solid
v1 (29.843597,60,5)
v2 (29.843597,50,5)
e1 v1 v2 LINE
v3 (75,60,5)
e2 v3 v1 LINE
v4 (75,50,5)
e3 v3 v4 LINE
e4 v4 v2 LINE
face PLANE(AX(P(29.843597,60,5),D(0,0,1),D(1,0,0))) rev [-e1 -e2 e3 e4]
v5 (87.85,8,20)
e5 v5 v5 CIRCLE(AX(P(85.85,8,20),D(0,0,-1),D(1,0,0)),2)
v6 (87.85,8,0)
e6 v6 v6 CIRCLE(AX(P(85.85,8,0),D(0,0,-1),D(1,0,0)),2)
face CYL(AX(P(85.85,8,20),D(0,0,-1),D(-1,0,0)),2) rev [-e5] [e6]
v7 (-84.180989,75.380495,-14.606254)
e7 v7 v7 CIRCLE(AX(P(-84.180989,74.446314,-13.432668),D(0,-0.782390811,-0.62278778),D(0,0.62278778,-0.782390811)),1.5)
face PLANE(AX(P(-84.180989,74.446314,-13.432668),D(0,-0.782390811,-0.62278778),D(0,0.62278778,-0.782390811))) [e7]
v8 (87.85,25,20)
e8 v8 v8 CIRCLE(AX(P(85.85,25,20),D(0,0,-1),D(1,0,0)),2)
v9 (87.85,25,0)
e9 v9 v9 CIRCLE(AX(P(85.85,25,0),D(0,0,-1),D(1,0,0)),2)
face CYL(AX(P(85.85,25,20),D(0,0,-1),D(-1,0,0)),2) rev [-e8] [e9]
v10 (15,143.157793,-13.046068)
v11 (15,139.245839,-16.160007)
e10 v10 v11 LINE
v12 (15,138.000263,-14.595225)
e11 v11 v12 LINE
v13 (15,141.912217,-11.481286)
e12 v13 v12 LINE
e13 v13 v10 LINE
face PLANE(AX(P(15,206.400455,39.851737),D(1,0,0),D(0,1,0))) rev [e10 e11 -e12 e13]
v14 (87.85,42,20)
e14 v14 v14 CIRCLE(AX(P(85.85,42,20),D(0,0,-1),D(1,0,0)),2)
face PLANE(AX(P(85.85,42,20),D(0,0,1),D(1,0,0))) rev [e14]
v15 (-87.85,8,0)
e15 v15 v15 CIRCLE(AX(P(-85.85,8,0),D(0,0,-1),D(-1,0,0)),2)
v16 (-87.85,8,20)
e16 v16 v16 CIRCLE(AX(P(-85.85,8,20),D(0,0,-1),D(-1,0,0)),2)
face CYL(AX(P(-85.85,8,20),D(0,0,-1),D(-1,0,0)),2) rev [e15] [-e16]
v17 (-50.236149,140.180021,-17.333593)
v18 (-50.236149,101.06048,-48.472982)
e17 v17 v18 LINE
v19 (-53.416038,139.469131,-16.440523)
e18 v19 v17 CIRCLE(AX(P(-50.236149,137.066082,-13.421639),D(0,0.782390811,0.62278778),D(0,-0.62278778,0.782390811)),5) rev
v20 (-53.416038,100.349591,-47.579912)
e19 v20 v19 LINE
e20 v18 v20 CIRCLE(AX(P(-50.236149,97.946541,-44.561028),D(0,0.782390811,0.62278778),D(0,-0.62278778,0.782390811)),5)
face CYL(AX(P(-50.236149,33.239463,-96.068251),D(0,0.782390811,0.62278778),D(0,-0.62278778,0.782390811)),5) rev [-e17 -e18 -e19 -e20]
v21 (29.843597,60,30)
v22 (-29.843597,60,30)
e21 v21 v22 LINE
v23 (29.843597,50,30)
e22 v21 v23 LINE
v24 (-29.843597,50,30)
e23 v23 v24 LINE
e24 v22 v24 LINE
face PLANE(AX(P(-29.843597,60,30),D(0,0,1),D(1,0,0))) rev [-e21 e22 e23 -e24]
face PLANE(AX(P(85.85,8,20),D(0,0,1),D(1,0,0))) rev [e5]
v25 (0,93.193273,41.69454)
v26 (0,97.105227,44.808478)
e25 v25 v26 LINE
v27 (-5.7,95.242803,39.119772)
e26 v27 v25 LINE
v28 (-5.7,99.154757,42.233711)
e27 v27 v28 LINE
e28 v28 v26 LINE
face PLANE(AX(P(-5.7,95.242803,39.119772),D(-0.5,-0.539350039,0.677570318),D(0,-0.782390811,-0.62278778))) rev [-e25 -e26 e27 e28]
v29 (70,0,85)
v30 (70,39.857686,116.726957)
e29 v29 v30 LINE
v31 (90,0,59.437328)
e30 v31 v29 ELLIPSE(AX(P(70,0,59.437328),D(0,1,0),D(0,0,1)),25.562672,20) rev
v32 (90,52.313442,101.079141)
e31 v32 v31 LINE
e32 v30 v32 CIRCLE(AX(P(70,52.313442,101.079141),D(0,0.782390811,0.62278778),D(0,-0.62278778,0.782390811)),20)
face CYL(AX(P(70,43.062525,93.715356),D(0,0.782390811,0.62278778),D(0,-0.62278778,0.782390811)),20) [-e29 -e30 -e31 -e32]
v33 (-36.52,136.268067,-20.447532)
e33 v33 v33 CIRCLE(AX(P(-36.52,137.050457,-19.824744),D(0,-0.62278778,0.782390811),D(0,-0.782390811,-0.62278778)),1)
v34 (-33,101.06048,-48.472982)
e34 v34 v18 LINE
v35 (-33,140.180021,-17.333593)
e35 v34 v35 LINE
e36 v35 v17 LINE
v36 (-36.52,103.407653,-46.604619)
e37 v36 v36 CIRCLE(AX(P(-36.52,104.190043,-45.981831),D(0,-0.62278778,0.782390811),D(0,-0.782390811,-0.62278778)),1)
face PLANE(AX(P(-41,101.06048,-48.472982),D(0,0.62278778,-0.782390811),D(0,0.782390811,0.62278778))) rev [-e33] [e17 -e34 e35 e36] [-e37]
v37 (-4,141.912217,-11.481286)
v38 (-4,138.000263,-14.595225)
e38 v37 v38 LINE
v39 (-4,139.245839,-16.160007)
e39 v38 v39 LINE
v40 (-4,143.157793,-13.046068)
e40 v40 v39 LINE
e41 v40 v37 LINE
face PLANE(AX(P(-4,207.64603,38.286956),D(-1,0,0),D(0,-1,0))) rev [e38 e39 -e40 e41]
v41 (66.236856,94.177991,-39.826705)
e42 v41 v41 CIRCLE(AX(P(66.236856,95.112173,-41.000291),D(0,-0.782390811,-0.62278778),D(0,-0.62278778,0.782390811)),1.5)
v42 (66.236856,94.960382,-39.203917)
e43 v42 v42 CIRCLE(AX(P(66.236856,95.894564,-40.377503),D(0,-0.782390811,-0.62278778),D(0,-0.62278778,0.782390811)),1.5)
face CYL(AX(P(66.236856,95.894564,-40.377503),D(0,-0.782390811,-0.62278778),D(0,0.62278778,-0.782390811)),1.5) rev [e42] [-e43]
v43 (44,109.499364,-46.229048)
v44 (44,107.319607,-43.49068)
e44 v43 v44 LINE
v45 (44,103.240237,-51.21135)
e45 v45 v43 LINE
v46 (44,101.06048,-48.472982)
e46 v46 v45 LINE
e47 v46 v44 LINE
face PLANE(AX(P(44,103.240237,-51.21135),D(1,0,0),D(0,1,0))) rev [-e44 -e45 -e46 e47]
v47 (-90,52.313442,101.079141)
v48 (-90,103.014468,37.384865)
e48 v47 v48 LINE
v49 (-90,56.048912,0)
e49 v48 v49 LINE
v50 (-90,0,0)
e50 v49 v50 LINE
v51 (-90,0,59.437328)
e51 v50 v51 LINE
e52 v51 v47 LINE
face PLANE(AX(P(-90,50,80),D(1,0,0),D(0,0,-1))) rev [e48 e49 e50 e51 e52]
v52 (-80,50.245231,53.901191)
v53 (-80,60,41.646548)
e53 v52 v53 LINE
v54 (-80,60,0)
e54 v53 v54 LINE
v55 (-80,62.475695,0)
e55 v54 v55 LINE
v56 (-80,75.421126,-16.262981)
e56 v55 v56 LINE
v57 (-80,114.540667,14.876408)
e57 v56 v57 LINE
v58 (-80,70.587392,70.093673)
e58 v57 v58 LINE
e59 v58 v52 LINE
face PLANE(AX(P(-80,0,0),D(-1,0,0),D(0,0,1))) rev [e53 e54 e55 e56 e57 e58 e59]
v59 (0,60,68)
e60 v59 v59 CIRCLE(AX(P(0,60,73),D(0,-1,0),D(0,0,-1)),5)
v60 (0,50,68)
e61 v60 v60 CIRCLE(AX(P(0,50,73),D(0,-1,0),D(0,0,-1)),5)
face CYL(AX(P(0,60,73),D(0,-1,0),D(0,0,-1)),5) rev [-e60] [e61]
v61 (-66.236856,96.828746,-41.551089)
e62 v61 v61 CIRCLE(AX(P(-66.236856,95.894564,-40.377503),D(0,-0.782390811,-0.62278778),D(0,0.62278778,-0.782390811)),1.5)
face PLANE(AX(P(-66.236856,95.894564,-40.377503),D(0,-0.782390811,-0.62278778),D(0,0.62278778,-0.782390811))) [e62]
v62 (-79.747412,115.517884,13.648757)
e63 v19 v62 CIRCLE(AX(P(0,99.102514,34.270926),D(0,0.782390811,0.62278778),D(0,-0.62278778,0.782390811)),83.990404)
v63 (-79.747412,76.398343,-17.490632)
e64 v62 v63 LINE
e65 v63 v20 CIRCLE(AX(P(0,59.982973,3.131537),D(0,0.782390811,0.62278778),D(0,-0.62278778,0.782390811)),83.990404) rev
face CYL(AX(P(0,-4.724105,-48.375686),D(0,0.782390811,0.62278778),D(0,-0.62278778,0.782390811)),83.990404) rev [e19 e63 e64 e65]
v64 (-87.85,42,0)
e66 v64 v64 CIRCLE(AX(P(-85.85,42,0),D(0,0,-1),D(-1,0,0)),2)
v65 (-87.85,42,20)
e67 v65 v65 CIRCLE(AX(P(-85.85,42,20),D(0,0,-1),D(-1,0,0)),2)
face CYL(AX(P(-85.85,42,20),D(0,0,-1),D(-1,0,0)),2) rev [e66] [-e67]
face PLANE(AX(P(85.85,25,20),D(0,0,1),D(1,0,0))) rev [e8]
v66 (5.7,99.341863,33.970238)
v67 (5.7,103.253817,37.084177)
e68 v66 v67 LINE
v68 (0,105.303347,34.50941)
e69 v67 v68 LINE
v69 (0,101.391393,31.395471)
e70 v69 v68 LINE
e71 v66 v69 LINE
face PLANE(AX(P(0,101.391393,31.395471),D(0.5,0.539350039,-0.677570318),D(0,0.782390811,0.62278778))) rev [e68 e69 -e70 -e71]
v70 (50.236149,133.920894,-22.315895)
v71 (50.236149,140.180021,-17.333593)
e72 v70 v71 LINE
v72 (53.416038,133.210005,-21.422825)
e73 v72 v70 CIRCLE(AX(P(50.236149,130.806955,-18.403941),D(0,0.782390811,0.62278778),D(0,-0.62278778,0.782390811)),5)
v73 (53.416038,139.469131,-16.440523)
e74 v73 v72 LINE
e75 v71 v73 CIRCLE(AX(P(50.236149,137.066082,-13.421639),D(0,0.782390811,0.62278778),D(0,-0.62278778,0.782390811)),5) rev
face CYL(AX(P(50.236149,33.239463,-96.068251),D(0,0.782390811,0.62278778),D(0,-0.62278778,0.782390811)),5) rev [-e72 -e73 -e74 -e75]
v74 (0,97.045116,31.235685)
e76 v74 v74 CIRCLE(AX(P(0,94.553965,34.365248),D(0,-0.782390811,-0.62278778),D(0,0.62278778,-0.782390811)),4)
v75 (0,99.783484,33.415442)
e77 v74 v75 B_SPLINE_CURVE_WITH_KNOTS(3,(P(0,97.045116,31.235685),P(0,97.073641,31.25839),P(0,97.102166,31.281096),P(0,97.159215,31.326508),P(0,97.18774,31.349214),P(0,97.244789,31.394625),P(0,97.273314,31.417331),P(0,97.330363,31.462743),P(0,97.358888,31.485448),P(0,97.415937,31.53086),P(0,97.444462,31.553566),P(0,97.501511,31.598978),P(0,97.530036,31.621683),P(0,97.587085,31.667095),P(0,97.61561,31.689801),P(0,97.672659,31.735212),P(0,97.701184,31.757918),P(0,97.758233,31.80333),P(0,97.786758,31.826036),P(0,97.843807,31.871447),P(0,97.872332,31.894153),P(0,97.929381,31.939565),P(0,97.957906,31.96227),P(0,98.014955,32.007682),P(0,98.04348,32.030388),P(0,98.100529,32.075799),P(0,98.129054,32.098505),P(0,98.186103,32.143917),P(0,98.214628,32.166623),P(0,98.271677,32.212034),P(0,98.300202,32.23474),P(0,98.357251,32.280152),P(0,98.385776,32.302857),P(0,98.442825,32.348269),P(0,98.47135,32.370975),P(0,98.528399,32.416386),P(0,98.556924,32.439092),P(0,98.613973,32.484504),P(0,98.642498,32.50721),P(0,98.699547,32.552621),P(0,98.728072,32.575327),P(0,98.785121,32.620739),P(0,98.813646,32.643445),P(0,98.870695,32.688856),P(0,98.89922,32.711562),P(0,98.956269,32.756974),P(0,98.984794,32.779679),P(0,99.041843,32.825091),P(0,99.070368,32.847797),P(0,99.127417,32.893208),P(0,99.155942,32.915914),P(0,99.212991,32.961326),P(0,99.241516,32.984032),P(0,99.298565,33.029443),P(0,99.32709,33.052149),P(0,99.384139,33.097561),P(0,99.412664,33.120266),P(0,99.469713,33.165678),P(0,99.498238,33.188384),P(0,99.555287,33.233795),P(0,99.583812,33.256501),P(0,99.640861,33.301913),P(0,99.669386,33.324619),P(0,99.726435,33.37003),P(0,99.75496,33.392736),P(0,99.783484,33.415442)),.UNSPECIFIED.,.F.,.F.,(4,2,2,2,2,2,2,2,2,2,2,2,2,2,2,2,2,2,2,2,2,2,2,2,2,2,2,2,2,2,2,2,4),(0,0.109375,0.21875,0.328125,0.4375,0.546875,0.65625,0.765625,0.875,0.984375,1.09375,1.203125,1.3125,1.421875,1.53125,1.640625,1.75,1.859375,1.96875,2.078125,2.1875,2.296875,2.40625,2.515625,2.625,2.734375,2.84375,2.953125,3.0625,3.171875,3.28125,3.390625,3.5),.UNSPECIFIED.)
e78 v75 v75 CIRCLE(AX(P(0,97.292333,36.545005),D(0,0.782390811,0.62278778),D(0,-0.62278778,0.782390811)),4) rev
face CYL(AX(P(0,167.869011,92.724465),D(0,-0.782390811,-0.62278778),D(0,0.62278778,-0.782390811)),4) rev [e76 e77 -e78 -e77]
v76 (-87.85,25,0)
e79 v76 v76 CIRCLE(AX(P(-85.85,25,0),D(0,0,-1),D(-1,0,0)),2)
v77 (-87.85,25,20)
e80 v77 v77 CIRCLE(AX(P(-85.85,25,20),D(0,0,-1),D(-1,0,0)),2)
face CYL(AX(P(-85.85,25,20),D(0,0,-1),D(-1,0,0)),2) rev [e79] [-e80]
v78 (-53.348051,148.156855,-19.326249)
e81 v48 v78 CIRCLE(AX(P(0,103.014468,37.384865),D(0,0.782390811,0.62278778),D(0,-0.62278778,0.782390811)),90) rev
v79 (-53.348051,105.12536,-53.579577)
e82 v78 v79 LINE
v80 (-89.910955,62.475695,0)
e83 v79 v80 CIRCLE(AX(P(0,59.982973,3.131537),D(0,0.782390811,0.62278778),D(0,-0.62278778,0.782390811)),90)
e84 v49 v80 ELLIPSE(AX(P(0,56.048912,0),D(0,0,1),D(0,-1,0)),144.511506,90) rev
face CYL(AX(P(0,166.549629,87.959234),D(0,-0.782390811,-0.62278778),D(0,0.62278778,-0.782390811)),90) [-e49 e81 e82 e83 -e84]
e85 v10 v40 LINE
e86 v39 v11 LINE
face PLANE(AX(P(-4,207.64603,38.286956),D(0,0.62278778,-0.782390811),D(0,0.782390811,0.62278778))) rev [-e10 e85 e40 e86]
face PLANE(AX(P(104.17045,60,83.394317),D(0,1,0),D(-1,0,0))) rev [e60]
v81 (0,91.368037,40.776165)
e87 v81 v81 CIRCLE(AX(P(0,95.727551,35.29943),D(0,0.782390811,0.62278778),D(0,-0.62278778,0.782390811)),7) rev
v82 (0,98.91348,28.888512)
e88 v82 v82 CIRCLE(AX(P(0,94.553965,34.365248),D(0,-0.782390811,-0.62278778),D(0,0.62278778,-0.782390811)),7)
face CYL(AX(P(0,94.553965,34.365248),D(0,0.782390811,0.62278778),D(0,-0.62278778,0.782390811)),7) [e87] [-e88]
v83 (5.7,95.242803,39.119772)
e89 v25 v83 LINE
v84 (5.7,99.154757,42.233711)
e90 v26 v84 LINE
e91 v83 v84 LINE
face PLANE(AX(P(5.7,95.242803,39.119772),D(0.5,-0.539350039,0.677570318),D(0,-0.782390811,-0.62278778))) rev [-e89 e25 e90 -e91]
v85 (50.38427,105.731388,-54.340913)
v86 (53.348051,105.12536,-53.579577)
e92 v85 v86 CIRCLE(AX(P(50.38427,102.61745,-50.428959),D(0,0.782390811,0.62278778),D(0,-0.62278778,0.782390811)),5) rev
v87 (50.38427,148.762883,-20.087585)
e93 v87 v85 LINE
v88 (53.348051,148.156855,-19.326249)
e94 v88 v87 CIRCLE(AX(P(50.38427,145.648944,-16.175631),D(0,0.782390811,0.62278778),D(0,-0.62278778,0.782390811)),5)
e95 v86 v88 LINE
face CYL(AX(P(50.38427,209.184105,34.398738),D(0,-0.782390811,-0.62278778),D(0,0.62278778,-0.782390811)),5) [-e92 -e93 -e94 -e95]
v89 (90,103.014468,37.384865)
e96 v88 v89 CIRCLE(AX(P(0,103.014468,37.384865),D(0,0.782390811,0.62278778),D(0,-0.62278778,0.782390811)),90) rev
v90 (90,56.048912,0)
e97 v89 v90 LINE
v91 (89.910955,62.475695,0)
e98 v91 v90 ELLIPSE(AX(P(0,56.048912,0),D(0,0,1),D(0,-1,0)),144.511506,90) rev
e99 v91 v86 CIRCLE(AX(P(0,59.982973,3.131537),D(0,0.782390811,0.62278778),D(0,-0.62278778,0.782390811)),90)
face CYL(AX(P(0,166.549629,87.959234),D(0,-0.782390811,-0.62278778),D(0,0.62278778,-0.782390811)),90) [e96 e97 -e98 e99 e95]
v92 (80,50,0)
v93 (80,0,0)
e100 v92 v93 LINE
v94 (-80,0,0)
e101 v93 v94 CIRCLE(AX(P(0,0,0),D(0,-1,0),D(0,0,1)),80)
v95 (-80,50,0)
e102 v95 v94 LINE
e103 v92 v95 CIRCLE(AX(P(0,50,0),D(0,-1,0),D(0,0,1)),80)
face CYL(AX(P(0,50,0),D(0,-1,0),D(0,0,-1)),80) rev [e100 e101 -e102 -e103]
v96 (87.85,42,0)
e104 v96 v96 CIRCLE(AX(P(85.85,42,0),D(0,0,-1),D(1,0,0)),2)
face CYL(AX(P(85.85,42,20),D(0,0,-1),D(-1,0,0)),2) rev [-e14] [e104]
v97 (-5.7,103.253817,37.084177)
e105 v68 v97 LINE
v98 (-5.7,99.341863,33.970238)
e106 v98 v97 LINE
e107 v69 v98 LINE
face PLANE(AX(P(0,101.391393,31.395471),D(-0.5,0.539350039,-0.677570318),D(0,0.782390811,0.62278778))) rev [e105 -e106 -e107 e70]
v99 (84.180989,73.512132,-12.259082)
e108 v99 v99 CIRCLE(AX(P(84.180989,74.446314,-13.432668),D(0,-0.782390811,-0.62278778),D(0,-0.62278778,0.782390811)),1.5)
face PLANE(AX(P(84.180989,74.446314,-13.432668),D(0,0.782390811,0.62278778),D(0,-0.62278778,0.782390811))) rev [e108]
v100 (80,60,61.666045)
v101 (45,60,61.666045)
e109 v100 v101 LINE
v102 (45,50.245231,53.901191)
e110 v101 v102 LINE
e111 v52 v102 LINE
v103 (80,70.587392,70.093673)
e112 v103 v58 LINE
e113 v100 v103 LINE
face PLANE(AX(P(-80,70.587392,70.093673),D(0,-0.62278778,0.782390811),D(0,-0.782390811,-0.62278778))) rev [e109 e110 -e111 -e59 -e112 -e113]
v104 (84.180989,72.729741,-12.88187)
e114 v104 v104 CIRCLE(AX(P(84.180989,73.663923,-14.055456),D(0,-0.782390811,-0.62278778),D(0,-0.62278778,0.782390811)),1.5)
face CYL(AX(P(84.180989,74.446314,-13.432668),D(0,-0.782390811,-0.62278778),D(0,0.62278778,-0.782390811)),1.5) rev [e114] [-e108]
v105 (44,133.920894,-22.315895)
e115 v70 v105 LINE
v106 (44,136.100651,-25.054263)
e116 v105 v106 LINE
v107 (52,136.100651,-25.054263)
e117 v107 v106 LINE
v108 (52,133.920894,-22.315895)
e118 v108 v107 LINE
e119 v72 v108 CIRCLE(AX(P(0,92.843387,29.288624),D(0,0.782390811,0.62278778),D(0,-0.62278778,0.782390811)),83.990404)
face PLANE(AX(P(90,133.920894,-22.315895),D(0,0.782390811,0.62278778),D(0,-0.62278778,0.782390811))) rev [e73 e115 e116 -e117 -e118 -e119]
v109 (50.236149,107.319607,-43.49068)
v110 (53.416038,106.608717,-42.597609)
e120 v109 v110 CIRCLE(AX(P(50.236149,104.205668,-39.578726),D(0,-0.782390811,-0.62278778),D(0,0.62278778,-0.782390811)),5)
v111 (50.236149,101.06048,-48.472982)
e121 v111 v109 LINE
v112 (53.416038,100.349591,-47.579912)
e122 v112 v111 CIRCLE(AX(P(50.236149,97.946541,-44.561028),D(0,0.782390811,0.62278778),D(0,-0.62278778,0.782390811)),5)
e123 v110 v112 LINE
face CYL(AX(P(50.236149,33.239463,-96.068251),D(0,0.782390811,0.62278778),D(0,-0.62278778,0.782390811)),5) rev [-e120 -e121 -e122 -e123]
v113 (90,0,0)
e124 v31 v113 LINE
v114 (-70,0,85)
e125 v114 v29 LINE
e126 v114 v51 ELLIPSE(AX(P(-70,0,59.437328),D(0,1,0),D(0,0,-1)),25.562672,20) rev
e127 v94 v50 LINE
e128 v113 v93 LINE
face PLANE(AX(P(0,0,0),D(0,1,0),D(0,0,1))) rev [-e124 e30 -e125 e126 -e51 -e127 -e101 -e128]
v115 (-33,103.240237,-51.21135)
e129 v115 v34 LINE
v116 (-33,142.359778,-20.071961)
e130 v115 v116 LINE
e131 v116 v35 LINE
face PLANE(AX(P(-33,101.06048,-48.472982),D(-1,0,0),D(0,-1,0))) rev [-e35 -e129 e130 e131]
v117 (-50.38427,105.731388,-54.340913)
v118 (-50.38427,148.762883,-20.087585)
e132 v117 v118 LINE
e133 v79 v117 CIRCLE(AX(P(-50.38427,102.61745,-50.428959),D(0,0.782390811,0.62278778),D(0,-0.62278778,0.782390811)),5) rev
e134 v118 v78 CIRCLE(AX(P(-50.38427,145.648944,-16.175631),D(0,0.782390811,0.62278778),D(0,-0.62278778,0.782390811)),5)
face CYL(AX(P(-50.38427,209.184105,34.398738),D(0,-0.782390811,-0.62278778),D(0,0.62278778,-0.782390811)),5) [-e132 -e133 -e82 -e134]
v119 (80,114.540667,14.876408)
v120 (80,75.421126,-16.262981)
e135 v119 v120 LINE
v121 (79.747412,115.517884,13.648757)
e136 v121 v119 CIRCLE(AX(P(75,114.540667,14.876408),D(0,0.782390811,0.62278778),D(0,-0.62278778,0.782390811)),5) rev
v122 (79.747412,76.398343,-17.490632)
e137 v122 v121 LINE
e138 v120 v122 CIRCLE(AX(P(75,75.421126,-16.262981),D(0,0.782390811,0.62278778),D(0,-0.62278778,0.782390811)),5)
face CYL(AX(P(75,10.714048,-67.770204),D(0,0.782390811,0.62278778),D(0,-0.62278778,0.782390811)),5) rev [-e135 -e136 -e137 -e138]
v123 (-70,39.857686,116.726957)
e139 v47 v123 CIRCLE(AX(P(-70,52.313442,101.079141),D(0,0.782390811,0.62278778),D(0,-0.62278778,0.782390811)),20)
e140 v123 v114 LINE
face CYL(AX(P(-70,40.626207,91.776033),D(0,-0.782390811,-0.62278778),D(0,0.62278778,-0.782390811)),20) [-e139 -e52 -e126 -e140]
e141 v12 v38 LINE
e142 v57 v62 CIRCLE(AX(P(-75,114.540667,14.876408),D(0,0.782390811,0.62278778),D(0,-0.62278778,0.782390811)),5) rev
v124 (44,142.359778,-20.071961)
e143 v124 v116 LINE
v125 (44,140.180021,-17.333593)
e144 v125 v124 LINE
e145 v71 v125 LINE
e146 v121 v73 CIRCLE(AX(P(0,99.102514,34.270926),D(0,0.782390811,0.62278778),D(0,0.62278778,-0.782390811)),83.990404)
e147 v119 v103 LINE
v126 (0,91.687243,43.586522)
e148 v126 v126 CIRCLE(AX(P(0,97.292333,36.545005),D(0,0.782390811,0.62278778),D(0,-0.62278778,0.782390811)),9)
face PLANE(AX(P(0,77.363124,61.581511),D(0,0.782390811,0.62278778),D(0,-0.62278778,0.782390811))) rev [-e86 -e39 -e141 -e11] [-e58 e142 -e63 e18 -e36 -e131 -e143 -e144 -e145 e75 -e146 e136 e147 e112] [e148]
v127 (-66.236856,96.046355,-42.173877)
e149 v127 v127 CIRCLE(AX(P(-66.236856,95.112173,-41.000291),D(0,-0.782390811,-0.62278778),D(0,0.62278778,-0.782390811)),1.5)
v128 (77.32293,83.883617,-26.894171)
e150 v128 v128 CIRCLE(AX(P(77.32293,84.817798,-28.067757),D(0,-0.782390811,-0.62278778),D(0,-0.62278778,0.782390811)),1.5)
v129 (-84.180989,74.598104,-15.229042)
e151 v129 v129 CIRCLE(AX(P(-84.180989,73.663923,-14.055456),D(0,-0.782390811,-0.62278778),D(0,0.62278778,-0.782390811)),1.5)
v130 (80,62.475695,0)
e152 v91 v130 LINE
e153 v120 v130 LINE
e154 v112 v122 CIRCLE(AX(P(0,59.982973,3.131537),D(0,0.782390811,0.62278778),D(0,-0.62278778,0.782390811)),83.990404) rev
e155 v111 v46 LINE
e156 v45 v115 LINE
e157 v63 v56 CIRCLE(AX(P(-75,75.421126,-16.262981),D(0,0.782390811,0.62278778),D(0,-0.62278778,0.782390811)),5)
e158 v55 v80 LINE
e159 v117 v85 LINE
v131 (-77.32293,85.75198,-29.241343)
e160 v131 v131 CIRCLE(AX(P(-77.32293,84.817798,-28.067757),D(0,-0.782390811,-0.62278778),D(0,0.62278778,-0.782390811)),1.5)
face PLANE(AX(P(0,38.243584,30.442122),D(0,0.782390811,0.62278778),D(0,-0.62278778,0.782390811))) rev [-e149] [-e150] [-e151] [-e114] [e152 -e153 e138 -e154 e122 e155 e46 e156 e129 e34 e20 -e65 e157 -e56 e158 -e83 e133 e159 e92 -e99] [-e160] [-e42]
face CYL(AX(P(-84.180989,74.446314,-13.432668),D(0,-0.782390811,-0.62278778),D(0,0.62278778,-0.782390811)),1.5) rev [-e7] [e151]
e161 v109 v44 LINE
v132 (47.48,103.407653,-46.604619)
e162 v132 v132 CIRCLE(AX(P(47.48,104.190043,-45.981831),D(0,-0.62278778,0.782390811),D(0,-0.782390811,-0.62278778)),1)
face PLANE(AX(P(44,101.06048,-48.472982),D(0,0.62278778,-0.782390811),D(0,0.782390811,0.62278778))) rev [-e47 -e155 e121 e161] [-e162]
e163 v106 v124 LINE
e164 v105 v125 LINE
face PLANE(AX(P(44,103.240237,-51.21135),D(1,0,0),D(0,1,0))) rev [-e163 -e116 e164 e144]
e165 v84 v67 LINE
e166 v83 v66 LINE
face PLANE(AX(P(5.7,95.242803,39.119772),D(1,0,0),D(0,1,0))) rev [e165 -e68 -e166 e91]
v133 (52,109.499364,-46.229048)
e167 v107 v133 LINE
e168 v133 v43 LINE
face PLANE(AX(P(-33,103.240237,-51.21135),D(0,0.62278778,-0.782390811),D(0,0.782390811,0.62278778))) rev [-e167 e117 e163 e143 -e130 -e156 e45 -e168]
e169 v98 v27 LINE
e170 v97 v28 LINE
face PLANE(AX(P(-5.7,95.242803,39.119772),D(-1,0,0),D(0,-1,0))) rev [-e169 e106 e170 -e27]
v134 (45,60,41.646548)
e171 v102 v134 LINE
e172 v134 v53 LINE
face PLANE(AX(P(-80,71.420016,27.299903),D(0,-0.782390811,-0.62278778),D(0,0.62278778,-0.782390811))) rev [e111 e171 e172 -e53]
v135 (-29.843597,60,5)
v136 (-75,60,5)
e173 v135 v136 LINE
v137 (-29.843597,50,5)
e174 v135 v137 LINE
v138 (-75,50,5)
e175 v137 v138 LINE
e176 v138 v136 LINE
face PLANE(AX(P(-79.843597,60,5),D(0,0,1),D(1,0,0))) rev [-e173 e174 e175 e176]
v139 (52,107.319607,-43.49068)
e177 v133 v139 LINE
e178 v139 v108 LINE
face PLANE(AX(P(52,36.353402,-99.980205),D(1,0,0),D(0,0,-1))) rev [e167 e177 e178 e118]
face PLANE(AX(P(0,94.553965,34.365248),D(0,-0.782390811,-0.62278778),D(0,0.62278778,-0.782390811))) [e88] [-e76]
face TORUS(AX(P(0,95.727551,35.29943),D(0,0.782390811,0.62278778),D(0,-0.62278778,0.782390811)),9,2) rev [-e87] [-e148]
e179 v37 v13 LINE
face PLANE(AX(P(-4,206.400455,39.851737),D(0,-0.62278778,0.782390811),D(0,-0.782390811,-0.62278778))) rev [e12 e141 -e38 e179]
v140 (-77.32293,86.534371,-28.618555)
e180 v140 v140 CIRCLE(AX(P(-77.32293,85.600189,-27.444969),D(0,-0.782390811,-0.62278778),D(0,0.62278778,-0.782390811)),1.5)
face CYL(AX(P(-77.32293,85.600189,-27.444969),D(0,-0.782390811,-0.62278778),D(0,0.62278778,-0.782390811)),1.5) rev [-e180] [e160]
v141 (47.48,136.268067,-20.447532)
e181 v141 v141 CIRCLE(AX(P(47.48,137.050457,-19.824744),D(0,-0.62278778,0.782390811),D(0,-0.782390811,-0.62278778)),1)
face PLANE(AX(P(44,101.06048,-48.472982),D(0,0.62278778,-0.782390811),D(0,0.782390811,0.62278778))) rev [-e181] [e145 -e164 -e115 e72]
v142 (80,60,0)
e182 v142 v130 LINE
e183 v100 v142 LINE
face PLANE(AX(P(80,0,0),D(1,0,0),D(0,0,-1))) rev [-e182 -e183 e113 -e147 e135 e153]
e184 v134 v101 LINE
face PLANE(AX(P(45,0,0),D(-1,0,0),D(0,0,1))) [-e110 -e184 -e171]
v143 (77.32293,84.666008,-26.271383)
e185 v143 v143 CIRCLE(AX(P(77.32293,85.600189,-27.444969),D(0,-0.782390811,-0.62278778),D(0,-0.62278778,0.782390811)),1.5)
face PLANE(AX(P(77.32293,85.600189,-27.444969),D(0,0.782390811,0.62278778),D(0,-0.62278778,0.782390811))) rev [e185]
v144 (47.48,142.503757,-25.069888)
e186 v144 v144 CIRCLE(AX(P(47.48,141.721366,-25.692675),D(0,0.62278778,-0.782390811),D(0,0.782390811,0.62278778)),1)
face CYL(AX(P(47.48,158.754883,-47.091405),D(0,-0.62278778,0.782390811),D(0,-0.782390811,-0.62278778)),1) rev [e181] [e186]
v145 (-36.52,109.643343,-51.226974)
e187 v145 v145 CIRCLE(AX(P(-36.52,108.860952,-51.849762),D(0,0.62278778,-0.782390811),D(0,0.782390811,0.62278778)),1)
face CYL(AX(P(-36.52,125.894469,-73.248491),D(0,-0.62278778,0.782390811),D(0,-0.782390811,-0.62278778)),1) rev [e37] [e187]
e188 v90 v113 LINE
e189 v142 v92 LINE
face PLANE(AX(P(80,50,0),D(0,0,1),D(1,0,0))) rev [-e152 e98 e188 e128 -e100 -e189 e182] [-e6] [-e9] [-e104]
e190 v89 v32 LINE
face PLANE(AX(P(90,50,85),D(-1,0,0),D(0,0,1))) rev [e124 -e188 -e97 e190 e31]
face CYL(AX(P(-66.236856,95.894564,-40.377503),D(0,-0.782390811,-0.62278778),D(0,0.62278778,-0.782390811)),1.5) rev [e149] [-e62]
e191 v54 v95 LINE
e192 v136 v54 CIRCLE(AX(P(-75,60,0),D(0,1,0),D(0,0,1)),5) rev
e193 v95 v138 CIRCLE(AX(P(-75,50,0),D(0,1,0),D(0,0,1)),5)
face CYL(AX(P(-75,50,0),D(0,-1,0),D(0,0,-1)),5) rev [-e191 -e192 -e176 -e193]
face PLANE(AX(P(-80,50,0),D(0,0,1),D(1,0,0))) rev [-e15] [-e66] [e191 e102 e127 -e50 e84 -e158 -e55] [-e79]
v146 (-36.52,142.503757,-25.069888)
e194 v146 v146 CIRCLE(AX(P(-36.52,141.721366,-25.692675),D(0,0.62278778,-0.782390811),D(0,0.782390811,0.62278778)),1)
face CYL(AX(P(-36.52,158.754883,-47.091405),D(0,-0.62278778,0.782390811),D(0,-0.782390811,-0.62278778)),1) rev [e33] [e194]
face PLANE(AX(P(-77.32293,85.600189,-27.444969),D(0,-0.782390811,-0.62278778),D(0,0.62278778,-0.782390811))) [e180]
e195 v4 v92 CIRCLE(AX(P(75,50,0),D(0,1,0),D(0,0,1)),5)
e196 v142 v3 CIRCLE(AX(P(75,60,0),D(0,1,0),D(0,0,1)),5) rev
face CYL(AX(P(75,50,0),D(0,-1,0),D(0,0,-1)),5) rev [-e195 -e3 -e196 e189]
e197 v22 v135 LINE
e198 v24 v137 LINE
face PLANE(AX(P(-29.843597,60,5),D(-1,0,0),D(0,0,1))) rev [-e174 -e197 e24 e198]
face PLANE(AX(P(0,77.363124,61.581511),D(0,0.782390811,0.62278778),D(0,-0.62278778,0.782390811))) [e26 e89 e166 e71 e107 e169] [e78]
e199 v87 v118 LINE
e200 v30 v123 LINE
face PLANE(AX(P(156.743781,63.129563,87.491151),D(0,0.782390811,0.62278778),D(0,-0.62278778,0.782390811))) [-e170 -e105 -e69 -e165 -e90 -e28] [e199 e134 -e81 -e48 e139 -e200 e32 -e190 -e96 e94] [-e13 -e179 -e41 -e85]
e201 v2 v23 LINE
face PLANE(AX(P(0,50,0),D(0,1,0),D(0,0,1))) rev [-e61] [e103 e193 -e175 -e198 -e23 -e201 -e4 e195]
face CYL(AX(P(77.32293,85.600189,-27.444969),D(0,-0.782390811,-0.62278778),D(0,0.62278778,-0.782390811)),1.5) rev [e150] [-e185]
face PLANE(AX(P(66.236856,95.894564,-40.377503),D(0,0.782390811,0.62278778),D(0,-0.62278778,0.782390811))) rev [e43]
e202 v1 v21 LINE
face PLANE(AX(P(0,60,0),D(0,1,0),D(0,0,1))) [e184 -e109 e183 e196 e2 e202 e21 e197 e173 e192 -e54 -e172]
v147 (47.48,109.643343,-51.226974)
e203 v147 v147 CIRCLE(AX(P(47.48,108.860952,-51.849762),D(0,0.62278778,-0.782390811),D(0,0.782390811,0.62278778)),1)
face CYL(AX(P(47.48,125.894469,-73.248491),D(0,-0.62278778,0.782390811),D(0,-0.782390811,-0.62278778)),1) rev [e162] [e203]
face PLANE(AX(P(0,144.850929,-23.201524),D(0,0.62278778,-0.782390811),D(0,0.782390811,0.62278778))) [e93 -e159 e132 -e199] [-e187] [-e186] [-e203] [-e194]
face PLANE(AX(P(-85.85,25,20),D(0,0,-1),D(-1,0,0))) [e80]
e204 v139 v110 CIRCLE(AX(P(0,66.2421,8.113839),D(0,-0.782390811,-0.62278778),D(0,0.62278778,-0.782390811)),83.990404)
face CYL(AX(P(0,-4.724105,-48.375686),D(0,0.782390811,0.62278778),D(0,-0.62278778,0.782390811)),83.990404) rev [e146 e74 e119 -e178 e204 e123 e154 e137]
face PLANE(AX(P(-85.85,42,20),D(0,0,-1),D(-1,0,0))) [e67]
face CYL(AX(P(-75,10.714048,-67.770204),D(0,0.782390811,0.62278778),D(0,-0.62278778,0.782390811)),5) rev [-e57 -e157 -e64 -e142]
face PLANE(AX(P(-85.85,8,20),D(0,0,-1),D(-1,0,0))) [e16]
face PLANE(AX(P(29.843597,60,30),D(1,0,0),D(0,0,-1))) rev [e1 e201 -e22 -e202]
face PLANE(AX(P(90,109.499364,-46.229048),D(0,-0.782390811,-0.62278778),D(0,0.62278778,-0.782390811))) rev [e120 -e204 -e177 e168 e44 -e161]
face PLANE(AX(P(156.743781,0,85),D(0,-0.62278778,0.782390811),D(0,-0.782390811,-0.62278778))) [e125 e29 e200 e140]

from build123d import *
from build123d.topology import SkipClean

# Parameters (mm, degrees)
BOSS_EXTRUDE1_DEPTH     = 50
BOSS_EXTRUDE2_DEPTH     = 10
BOSS_EXTRUDE3_DEPTH     = 180
BOSS_EXTRUDE4_DEPTH     = 1
SKETCH5_R               = 5.000000000000004
CUT_EXTRUDE1_DEPTH      = 10
CUT_EXTRUDE2_START      = -45
CUT_EXTRUDE2_DEPTH      = 125
BOSS_EXTRUDE5_DEPTH     = 50
SKETCH9_W               = 19.00000000000001
SKETCH9_H               = 2
CUT_EXTRUDE4_DEPTH      = 168.27334060368
SKETCH10_R              = 0.9999999999999983
CUT_EXTRUDE5_DEPTH      = 230.185827636167
CUT_EXTRUDE6_DEPTH      = 230.501199712143
MOVE_START              = 108.36404793
MOVE_FACE1_OUTLINE_R    = 1
MOVE_FACE1_DEPTH        = 2.5
BOSS_EXTRUDE6_DEPTH     = 10
CUT_EXTRUDE7_DEPTH      = 166.9007577827861
CUT_EXTRUDE7_DEPTH_BACK = 166.9007577827861
MOVE_FACE2_BY           = 11
BOSS_EXTRUDE7_DEPTH     = 50
MOVE_START_2            = 99.880409976
MOVE_FACE3_OUTLINE_W    = 19
MOVE_FACE3_OUTLINE_H    = 2
MOVE_FACE3_DEPTH        = 4
SKETCH19_R              = 6.999999999999999
BOSS_EXTRUDE9_DEPTH     = 3.5
SKETCH20_R              = 4
CUT_EXTRUDE8_DEPTH      = 164.1142193856788
CUT_EXTRUDE9_DEPTH      = 5
FILLET1_R               = 2
BOSS_EXTRUDE10_DEPTH    = 160
SKETCH23_R              = 1.9999999999999967
SKETCH23_R_2            = 1.9999999999999962
CUT_EXTRUDE10_DEPTH     = 20
FILLET2_R               = 5
FILLET3_R               = 5
SKETCH24_R              = 1.4999999999999973
CUT_EXTRUDE11_DEPTH     = 1
FILLET4_R               = 20


# Read off the part's stored shape, not the designer's step: Move Face1, Move Face3
with BuildPart() as part:
    # Sketch1 → Boss-Extrude1 (new body)
    with BuildSketch(Plane(origin=(0, 0, 0), x_dir=(1, 0, 0), z_dir=(0, 1, 0))):
        with BuildLine():
            Line((-79.99999999999999, 0), (-90, -1.22e-15))
            Line((-90, -1.22e-15), (-89.99999999999999, -80))
            Line((-89.99999999999999, -80), (-90, -85))
            Line((-90, -85), (90.00000000000001, -85))
            Line((90.00000000000001, -85), (90, -80))
            Line((90, -80), (89.99999999999999, 0))
            Line((89.99999999999999, 0), (79.99999999999999, 0))
            ThreePointArc((79.99999999999999, 0), (-1.47e-14, -79.99999999999999), (-79.99999999999999, 0))
        make_face()
    extrude(amount=BOSS_EXTRUDE1_DEPTH)

    # Sketch2 → Boss-Extrude2 (add)
    with SkipClean():  # the faces are left unmerged after this step: merging them gives an invalid solid
        with BuildSketch(Plane(origin=(0, 50, 0), x_dir=(1, 0, 0), z_dir=(0, 1, 0))):
            with BuildLine():
                Line((-79.84359711335655, -5.000000000000001), (-29.843597113356545, -5.000000000000001))
                Line((-29.843597113356545, -5.000000000000001), (-29.84359711335654, -30.000000000000007))
                Line((-29.84359711335654, -30.000000000000007), (29.843597113356545, -30.000000000000004))
                Line((29.843597113356545, -30.000000000000004), (29.843597113356545, -5.000000000000001))
                Line((29.843597113356545, -5.000000000000001), (79.84359711335655, -5.000000000000001))
                ThreePointArc((79.84359711335655, -5.000000000000001), (79.96088971825077, -2.5012227941024374), (79.99999999999999, 0))
                Line((79.99999999999999, 0), (89.99999999999999, 0))
                Line((89.99999999999999, 0), (90.00000000000001, -85))
                Line((90.00000000000001, -85), (-90, -85))
                Line((-90, -85), (-90, -1.22e-15))
                Line((-90, -1.22e-15), (-79.99999999999999, 9.8e-15))
                ThreePointArc((-79.99999999999999, 9.8e-15), (-79.96088971825077, -2.5012227941024125), (-79.84359711335655, -5.000000000000001))
            make_face()
        extrude(amount=BOSS_EXTRUDE2_DEPTH)

    # Sketch3 → Boss-Extrude3 (add)
    with SkipClean():  # the faces are left unmerged after this step: merging them gives an invalid solid
        with BuildSketch(Plane.ZY.offset(89.99999999999976)):
            Polygon((85.00000000000026, 60.00000000000001), (114.23580618359753, 36.72812282848156), (85.00000000000026, 0), align=None)
        extrude(amount=-BOSS_EXTRUDE3_DEPTH)

    # Sketch4 → Boss-Extrude4 (add)
    with SkipClean():  # the faces are left unmerged after this step: merging them gives an invalid solid
        with BuildSketch(Plane(origin=(-1.7265e-13, 78.1455149219112, 62.204298843248544), x_dir=(1, 1.35e-15, 1.08e-15), z_dir=(-1.7285833333827452e-15, 0.7823908105765895, 0.6227877804881108))):
            Polygon((90.00000000000018, -29.13595206972344), (90.00000000000018, 110.8640479302766), (-89.99999999999982, 110.86404793027657), (-89.99999999999982, -29.13595206972344), align=None)
        extrude(amount=-BOSS_EXTRUDE4_DEPTH)

    # Sketch5 → Cut-Extrude1 (cut)
    with SkipClean():  # the faces are left unmerged after this step: merging them gives an invalid solid
        with BuildSketch(Plane.XZ.offset(-50)):
            with Locations(Location((0, 73, 0), (0, 0, 270))):
                Circle(SKETCH5_R)
        extrude(amount=-CUT_EXTRUDE1_DEPTH, mode=Mode.SUBTRACT)

    # Sketch6 → Cut-Extrude2 (cut)
    with SkipClean():  # the faces are left unmerged after this step: merging them gives an invalid solid
        with BuildSketch(Plane(origin=(89.99999999999977, 0, -2.498e-13), x_dir=(-2.78e-15, 0, -1), z_dir=(1, 0, -2.78e-15)).offset(CUT_EXTRUDE2_START)):
            Polygon((-43.49238526196363, 91.76217680489371), (-27.29990296927273, 71.4200157299024), (-53.90119052887675, 50.2452311933066), (-70.09367282156765, 70.58739226829792), align=None)
        extrude(amount=-CUT_EXTRUDE2_DEPTH, mode=Mode.SUBTRACT)

    # Sketch7 → Boss-Extrude5 (add)
    with SkipClean():  # the faces are left unmerged after this step: merging them gives an invalid solid
        with BuildSketch(Plane(origin=(-1.729e-13, 77.36312411133467, 61.58151106276047), x_dir=(1, 1.37e-15, 1.09e-15), z_dir=(1.7486012637846216e-15, -0.7823908105765892, -0.622787780488111))):
            Polygon((-40.999999999999815, -110.8640479302766), (-40.999999999999815, -100.8640479302766), (-32.999999999999815, -100.8640479302766), (-32.999999999999815, -104.36404793027661), (44.0000000000002, -104.36404793027664), (44.0000000000002, -100.86404793027663), (52.0000000000002, -100.86404793027663), (52.00000000000019, -110.86404793027663), align=None)
        extrude(amount=BOSS_EXTRUDE5_DEPTH)

    # Sketch9 → Cut-Extrude4 (cut, through all)
    with SkipClean():  # the faces are left unmerged after this step: merging them gives an invalid solid
        with BuildSketch(Plane(origin=(-1.729e-13, 77.36312411133464, 61.581511062760434), x_dir=(1, 1.37e-15, 1.09e-15), z_dir=(1.748601263784622e-15, -0.7823908105765893, -0.6227877804881111))):
            with Locations((5.500000000000188, -98.36404793027664)):
                Rectangle(SKETCH9_W, SKETCH9_H)
        extrude(amount=-CUT_EXTRUDE4_DEPTH, mode=Mode.SUBTRACT)

    # Sketch10 → Cut-Extrude5 (cut, through all)
    with SkipClean():  # the faces are left unmerged after this step: merging them gives an invalid solid
        with BuildSketch(Plane(origin=(0, 62.816896541543485, -78.91510421820516), x_dir=(1, 1.35e-15, -1.69e-15), z_dir=(2.1607291667284334e-15, -0.622787780488111, 0.7823908105765892))):
            with Locations(Location((-36.519999999999676, 52.88040997608497, 0), (0, 0, 270))):
                Circle(SKETCH10_R)
            with Locations(Location((-36.519999999999825, 94.88040997608498, 0), (0, 0, 270))):
                Circle(SKETCH10_R)
            with Locations(Location((47.48000000000033, 52.88040997608497, 0), (0, 0, 270))):
                Circle(SKETCH10_R)
            with Locations(Location((47.48000000000018, 94.88040997608498, 0), (0, 0, 270))):
                Circle(SKETCH10_R)
        extrude(amount=-CUT_EXTRUDE5_DEPTH, mode=Mode.SUBTRACT)

    # Sketch11 → Cut-Extrude6 (cut, through all)
    with SkipClean():  # the faces are left unmerged after this step: merging them gives an invalid solid
        with BuildSketch(Plane.ZY.offset(-44.0000000000002)):
            Polygon((-46.229047772963376, 109.49936384036971), (-43.4906799359453, 107.3196066086613), (-22.315895399349515, 133.92089416826528), (-25.054263236367618, 136.10065139997369), align=None)
        extrude(amount=-CUT_EXTRUDE6_DEPTH, mode=Mode.SUBTRACT)

    # Move Face1 outline → Move Face1 (cut)
    with SkipClean():  # the faces are left unmerged after this step: merging them gives an invalid solid
        with BuildSketch(Plane(origin=(0, 0, 0), x_dir=(1, 0, 0), z_dir=(0, 0.6227877804881108, -0.7823908105765897)).offset(MOVE_START)):
            Polygon((52, -98.880409976), (52, -48.880409976), (-41, -48.880409976), (-41, -98.880409976), (-90, -98.880409976), (-90, -99.880409976), (90, -99.880409976), (90, -98.880409976), align=None)
            with Locations((-36.52, -94.880409976)):
                Circle(MOVE_FACE1_OUTLINE_R, mode=Mode.SUBTRACT)
            with Locations((47.48, -94.880409976)):
                Circle(MOVE_FACE1_OUTLINE_R, mode=Mode.SUBTRACT)
            with Locations((-36.52, -52.880409976)):
                Circle(MOVE_FACE1_OUTLINE_R, mode=Mode.SUBTRACT)
            with Locations((47.48, -52.880409976)):
                Circle(MOVE_FACE1_OUTLINE_R, mode=Mode.SUBTRACT)
        extrude(amount=MOVE_FACE1_DEPTH, mode=Mode.SUBTRACT)

    # Sketch15 → Boss-Extrude6 (add)
    with SkipClean():  # the faces are left unmerged after this step: merging them gives an invalid solid
        with BuildSketch(Plane(origin=(89.99999999999977, 0, -2.498e-13), x_dir=(-2.78e-15, 0, -1), z_dir=(1, 0, -2.78e-15))):
            Polygon((-2.498e-13, 60.00000000000001), (-6.13e-15, 126.38237647910833), (-83.39431660136961, 60.00000000000001), align=None)
        boss_extrude6 = extrude(amount=-BOSS_EXTRUDE6_DEPTH)

    # Mirror1: Boss-Extrude6 across plane
    with SkipClean():  # the faces are left unmerged after this step: merging them gives an invalid solid
        add(boss_extrude6.mirror(Plane(origin=(0, 0, 0), x_dir=(0, 0, 1), z_dir=(1, 0, 0))))

    # Sketch16 → Cut-Extrude7 (cut, two sides: drawn at the far end of the back side and taken through both)
    with SkipClean():  # the faces are left unmerged after this step: merging them gives an invalid solid
        with BuildSketch(Plane(origin=(-1.729e-13, 77.36312411133464, 61.581511062760434), x_dir=(1, 1.37e-15, 1.09e-15), z_dir=(1.748601263784622e-15, -0.7823908105765893, -0.6227877804881111)).offset(-CUT_EXTRUDE7_DEPTH_BACK)):
            with BuildLine():
                Line((52.00000000000019, -108.36404793027661), (90.0000000000002, -108.3640479302766))
                Line((90.0000000000002, -108.3640479302766), (90.00000000000009, -34.90657724144905))
                ThreePointArc((90.00000000000009, -34.90657724144905), (79.93747556684534, -76.25872349771953), (52.00000000000019, -108.36404793027661))
            make_face()
            with BuildLine():
                Line((-90.00000000000009, -34.90657724144905), (-89.99999999999983, -108.36404793027658))
                Line((-89.99999999999983, -108.36404793027658), (-52.00000000000019, -108.36404793027661))
                ThreePointArc((-52.00000000000019, -108.36404793027661), (-79.9374755668455, -76.25872349771961), (-90.00000000000009, -34.90657724144905))
            make_face()
        extrude(amount=CUT_EXTRUDE7_DEPTH + CUT_EXTRUDE7_DEPTH_BACK, mode=Mode.SUBTRACT)

    # Move Face2: a face moved outward by 11.0
    extrude(part.faces().sort_by_distance((-41, 122.955704565, -35.837253207))[0], amount=MOVE_FACE2_BY, dir=(-1, 0, 0))

    # Sketch17 → Boss-Extrude7 (add)
    with SkipClean():  # the faces are left unmerged after this step: merging them gives an invalid solid
        with BuildSketch(Plane(origin=(-1.729e-13, 77.36312411133467, 61.58151106276047), x_dir=(1, 1.37e-15, 1.09e-15), z_dir=(1.7486012637846216e-15, -0.7823908105765892, -0.622787780488111))):
            with BuildLine():
                Line((89.99999999999986, -34.906577241449064), (80.00000000000007, -34.90657724144905))
                Line((80.00000000000007, -34.90657724144905), (80.00000000000007, -60.48758464279222))
                ThreePointArc((80.00000000000007, -60.48758464279222), (69.01858225797905, -82.76912254324183), (52.00000000000029, -100.86404793027668))
                Line((52.00000000000029, -100.86404793027668), (52.00000000000013, -108.36404793027663))
                ThreePointArc((52.00000000000013, -108.36404793027663), (79.9374755668453, -76.25872349771953), (89.99999999999986, -34.906577241449064))
            make_face()
            with BuildLine():
                Line((-52.00000000000029, -100.86404793027668), (-52.00000000000013, -108.36404793027661))
                ThreePointArc((-52.00000000000013, -108.36404793027661), (-79.9374755668453, -76.25872349771953), (-89.99999999999986, -34.906577241449064))
                Line((-89.99999999999986, -34.906577241449064), (-80.00000000000007, -34.90657724144905))
                Line((-80.00000000000007, -34.90657724144905), (-80.00000000000007, -60.48758464279222))
                ThreePointArc((-80.00000000000007, -60.48758464279222), (-69.01858225797905, -82.76912254324183), (-52.00000000000029, -100.86404793027668))
            make_face()
        extrude(amount=BOSS_EXTRUDE7_DEPTH)

    # Move Face3 outline → Move Face3 (add)
    with SkipClean():  # the faces are left unmerged after this step: merging them gives an invalid solid
        with BuildSketch(Plane(origin=(0, 0, 0), x_dir=(1, 0, 0), z_dir=(0, 0.7823908105765892, 0.6227877804881111)).offset(MOVE_START_2)):
            with BuildLine():
                Line((-90, 34.906577241), (-90, -66.503218899))
                Line((-90, -66.503218899), (90, -66.503218899))
                Line((90, -66.503218899), (90, 34.906577241))
                ThreePointArc((90, 34.906577241), (79.937475567, 76.258723498), (52, 108.36404793))
                Line((52, 108.36404793), (-52, 108.36404793))
                ThreePointArc((-52, 108.36404793), (-79.937475567, 76.258723498), (-90, 34.906577241))
            make_face()
            with Locations((5.500000000000001, 98.36404793)):
                Rectangle(MOVE_FACE3_OUTLINE_W, MOVE_FACE3_OUTLINE_H, mode=Mode.SUBTRACT)
        extrude(amount=MOVE_FACE3_DEPTH)

    # Sketch19 → Boss-Extrude9 (add)
    with SkipClean():  # the faces are left unmerged after this step: merging them gives an invalid solid
        with BuildSketch(Plane(origin=(-1.729e-13, 77.36312411133467, 61.58151106276047), x_dir=(1, 1.37e-15, 1.09e-15), z_dir=(1.7486012637846216e-15, -0.7823908105765892, -0.622787780488111))):
            with Locations(Location((3.92e-15, -31.99999999999997, 0), (0, 0, 90))):
                Circle(SKETCH19_R)
        extrude(amount=BOSS_EXTRUDE9_DEPTH)

    # Sketch20 → Cut-Extrude8 (cut, through all)
    with SkipClean():  # the faces are left unmerged after this step: merging them gives an invalid solid
        with BuildSketch(Plane(origin=(-1.6678e-13, 74.62475627431662, 59.40175383105214), x_dir=(1, 1.37e-15, 1.09e-15), z_dir=(1.748601263784622e-15, -0.7823908105765891, -0.6227877804881111))):
            with Locations(Location((3.92e-15, -32.00000000000001, 0), (0, 0, 270))):
                Circle(SKETCH20_R)
        extrude(amount=-CUT_EXTRUDE8_DEPTH, mode=Mode.SUBTRACT)

    # Sketch21 → Cut-Extrude9 (cut)
    with SkipClean():  # the faces are left unmerged after this step: merging them gives an invalid solid
        with BuildSketch(Plane(origin=(-1.7957e-13, 81.27507816421755, 64.69544996520096), x_dir=(1, 1.35e-15, 1.08e-15), z_dir=(-1.7285833333827458e-15, 0.7823908105765893, 0.6227877804881111))):
            Polygon((5.699999999999912, 28.70910346561886), (5.699999999999912, 35.29089653438061), (-9.468e-14, 38.58179306876147), (-5.700000000000093, 35.29089653438113), (-5.7000000000000925, 28.709103465618856), (-9.468e-14, 25.418206931237993), align=None)
        extrude(amount=-CUT_EXTRUDE9_DEPTH, mode=Mode.SUBTRACT)

    # Fillet1
    fillet1_edges = [part.edges().sort_by_distance(p)[0] for p in [
        (-1.7027e-13, 101.65184755037099, 31.068269450273508),
    ]]
    fillet(fillet1_edges, radius=FILLET1_R)

    # Sketch22 → Boss-Extrude10 (add)
    with BuildSketch(Plane(origin=(-80.00000000000027, 3.195e-14, 2.3411e-13), x_dir=(-2.93e-15, 0, -1), z_dir=(1, -4e-16, -2.93e-15))):
        Polygon((-61.66604503914139, 59.999999999999964), (-70.09367282156744, 70.58739226829763), (-83.39431660136914, 59.99999999999997), align=None)
    extrude(amount=BOSS_EXTRUDE10_DEPTH)

    # Sketch23 → Cut-Extrude10 (cut)
    with BuildSketch(Plane(origin=(0, 0, 0), x_dir=(-1, 0, 1.2e-16), z_dir=(-1.2e-16, 0, -1))):
        with Locations((85.85000000000079, 25)):
            Circle(SKETCH23_R)
        with Locations((85.85000000000078, 42)):
            Circle(SKETCH23_R)
        with Locations((85.85000000000079, 8)):
            Circle(SKETCH23_R_2)
        with Locations(Location((-85.85000000000079, 8, 0), (0, 0, 180))):
            Circle(SKETCH23_R_2)
        with Locations(Location((-85.85000000000079, 25, 0), (0, 0, 180))):
            Circle(SKETCH23_R)
        with Locations(Location((-85.85000000000078, 42, 0), (0, 0, 180))):
            Circle(SKETCH23_R)
    extrude(amount=-CUT_EXTRUDE10_DEPTH, mode=Mode.SUBTRACT)

    # Fillet2
    # the kernel refuses this fillet: 5 mm, written as the material it adds along each edge
    with BuildSketch(Plane(origin=(-79.84359711335655, 50, 5.000000000000001), x_dir=(1, 0, 0), z_dir=(0, 1, 0))) as fillet2_piece_1:
        with BuildLine():
            CenterArc((4.843597113396129, 5), FILLET2_R, 179.99999999999926, 90.00000000000074)
            ThreePointArc((-0.15640288660387114, 5.000000000000065), (-0.11729260485174109, 2.498777205898306), (0, 0))
            Line((0, 0), (4.843597113396129, 0))
        make_face()
    extrude(amount=10)
    with BuildSketch(Plane(origin=(79.84359711335655, 50, 5.000000000000002), x_dir=(0.03126528492628181, 0, -0.9995111214781346), z_dir=(0, 1, 0))) as fillet2_piece_2:
        with BuildLine():
            CenterArc((4.846119163573464, 4.997555607390671), FILLET2_R, 181.7916608492473, 89.99999999998931)
            Line((-0.15143644381717802, 4.8412291827582825), (0, 0))
            ThreePointArc((0, 0), (2.5012227941024627, -0.03911028174922443), (5.002445588204924, 1e-17))
        make_face()
    extrude(amount=10)

    # Fillet3
    fillet3_edges = [part.edges().sort_by_distance(p)[0] for p in [
        (-52, 125.29115874188535, -38.77121874680839),
        (52, 125.29115874188535, -38.77121874680839),
        (52.00000000000011, 104.19004336635504, -45.981831057897686),
        (-51.99999999999994, 120.62025038846329, -32.90328766764741),
        (52.000000000000036, 137.05045741057177, -19.824744277397034),
        (79.99999999999994, 95.47428243369137, -1.3131138279364887),
        (-80.0000000000002, 95.47428243369114, -1.3131138279366592),
    ]]
    fillet(fillet3_edges, radius=FILLET3_R)

    # Sketch24 → Cut-Extrude11 (cut)
    with BuildSketch(Plane(origin=(-7.978e-14, 38.24358358250525, 30.442122038354945), x_dir=(1, 1.28e-15, 1.02e-15), z_dir=(1.632184084454057e-15, -0.7823908105765897, -0.6227877804881106))):
        with Locations(Location((-84.18098897752914, -56.87385050794939, 0), (0, 0, 270))):
            Circle(SKETCH24_R)
        with Locations(Location((-77.32293017480559, -74.78344358250106, 0), (0, 0, 270))):
            Circle(SKETCH24_R)
        with Locations(Location((-66.23685613820928, -91.31295001018994, 0), (0, 0, 270))):
            Circle(SKETCH24_R)
        with Locations(Location((66.23685613820928, -91.31295001018994, 0), (0, 0, 90))):
            Circle(SKETCH24_R)
        with Locations(Location((77.32293017480559, -74.78344358250106, 0), (0, 0, 90))):
            Circle(SKETCH24_R)
        with Locations(Location((84.18098897752914, -56.87385050794939, 0), (0, 0, 90))):
            Circle(SKETCH24_R)
    extrude(amount=-CUT_EXTRUDE11_DEPTH, mode=Mode.SUBTRACT)

    # Fillet4
    fillet4_edges = [part.edges().sort_by_distance(p)[0] for p in [
        (-90, 19.92884303536391, 100.86347865274452),
        (90, 19.92884303536391, 100.86347865274465),
    ]]
    fillet(fillet4_edges, radius=FILLET4_R)


solid = part.part
